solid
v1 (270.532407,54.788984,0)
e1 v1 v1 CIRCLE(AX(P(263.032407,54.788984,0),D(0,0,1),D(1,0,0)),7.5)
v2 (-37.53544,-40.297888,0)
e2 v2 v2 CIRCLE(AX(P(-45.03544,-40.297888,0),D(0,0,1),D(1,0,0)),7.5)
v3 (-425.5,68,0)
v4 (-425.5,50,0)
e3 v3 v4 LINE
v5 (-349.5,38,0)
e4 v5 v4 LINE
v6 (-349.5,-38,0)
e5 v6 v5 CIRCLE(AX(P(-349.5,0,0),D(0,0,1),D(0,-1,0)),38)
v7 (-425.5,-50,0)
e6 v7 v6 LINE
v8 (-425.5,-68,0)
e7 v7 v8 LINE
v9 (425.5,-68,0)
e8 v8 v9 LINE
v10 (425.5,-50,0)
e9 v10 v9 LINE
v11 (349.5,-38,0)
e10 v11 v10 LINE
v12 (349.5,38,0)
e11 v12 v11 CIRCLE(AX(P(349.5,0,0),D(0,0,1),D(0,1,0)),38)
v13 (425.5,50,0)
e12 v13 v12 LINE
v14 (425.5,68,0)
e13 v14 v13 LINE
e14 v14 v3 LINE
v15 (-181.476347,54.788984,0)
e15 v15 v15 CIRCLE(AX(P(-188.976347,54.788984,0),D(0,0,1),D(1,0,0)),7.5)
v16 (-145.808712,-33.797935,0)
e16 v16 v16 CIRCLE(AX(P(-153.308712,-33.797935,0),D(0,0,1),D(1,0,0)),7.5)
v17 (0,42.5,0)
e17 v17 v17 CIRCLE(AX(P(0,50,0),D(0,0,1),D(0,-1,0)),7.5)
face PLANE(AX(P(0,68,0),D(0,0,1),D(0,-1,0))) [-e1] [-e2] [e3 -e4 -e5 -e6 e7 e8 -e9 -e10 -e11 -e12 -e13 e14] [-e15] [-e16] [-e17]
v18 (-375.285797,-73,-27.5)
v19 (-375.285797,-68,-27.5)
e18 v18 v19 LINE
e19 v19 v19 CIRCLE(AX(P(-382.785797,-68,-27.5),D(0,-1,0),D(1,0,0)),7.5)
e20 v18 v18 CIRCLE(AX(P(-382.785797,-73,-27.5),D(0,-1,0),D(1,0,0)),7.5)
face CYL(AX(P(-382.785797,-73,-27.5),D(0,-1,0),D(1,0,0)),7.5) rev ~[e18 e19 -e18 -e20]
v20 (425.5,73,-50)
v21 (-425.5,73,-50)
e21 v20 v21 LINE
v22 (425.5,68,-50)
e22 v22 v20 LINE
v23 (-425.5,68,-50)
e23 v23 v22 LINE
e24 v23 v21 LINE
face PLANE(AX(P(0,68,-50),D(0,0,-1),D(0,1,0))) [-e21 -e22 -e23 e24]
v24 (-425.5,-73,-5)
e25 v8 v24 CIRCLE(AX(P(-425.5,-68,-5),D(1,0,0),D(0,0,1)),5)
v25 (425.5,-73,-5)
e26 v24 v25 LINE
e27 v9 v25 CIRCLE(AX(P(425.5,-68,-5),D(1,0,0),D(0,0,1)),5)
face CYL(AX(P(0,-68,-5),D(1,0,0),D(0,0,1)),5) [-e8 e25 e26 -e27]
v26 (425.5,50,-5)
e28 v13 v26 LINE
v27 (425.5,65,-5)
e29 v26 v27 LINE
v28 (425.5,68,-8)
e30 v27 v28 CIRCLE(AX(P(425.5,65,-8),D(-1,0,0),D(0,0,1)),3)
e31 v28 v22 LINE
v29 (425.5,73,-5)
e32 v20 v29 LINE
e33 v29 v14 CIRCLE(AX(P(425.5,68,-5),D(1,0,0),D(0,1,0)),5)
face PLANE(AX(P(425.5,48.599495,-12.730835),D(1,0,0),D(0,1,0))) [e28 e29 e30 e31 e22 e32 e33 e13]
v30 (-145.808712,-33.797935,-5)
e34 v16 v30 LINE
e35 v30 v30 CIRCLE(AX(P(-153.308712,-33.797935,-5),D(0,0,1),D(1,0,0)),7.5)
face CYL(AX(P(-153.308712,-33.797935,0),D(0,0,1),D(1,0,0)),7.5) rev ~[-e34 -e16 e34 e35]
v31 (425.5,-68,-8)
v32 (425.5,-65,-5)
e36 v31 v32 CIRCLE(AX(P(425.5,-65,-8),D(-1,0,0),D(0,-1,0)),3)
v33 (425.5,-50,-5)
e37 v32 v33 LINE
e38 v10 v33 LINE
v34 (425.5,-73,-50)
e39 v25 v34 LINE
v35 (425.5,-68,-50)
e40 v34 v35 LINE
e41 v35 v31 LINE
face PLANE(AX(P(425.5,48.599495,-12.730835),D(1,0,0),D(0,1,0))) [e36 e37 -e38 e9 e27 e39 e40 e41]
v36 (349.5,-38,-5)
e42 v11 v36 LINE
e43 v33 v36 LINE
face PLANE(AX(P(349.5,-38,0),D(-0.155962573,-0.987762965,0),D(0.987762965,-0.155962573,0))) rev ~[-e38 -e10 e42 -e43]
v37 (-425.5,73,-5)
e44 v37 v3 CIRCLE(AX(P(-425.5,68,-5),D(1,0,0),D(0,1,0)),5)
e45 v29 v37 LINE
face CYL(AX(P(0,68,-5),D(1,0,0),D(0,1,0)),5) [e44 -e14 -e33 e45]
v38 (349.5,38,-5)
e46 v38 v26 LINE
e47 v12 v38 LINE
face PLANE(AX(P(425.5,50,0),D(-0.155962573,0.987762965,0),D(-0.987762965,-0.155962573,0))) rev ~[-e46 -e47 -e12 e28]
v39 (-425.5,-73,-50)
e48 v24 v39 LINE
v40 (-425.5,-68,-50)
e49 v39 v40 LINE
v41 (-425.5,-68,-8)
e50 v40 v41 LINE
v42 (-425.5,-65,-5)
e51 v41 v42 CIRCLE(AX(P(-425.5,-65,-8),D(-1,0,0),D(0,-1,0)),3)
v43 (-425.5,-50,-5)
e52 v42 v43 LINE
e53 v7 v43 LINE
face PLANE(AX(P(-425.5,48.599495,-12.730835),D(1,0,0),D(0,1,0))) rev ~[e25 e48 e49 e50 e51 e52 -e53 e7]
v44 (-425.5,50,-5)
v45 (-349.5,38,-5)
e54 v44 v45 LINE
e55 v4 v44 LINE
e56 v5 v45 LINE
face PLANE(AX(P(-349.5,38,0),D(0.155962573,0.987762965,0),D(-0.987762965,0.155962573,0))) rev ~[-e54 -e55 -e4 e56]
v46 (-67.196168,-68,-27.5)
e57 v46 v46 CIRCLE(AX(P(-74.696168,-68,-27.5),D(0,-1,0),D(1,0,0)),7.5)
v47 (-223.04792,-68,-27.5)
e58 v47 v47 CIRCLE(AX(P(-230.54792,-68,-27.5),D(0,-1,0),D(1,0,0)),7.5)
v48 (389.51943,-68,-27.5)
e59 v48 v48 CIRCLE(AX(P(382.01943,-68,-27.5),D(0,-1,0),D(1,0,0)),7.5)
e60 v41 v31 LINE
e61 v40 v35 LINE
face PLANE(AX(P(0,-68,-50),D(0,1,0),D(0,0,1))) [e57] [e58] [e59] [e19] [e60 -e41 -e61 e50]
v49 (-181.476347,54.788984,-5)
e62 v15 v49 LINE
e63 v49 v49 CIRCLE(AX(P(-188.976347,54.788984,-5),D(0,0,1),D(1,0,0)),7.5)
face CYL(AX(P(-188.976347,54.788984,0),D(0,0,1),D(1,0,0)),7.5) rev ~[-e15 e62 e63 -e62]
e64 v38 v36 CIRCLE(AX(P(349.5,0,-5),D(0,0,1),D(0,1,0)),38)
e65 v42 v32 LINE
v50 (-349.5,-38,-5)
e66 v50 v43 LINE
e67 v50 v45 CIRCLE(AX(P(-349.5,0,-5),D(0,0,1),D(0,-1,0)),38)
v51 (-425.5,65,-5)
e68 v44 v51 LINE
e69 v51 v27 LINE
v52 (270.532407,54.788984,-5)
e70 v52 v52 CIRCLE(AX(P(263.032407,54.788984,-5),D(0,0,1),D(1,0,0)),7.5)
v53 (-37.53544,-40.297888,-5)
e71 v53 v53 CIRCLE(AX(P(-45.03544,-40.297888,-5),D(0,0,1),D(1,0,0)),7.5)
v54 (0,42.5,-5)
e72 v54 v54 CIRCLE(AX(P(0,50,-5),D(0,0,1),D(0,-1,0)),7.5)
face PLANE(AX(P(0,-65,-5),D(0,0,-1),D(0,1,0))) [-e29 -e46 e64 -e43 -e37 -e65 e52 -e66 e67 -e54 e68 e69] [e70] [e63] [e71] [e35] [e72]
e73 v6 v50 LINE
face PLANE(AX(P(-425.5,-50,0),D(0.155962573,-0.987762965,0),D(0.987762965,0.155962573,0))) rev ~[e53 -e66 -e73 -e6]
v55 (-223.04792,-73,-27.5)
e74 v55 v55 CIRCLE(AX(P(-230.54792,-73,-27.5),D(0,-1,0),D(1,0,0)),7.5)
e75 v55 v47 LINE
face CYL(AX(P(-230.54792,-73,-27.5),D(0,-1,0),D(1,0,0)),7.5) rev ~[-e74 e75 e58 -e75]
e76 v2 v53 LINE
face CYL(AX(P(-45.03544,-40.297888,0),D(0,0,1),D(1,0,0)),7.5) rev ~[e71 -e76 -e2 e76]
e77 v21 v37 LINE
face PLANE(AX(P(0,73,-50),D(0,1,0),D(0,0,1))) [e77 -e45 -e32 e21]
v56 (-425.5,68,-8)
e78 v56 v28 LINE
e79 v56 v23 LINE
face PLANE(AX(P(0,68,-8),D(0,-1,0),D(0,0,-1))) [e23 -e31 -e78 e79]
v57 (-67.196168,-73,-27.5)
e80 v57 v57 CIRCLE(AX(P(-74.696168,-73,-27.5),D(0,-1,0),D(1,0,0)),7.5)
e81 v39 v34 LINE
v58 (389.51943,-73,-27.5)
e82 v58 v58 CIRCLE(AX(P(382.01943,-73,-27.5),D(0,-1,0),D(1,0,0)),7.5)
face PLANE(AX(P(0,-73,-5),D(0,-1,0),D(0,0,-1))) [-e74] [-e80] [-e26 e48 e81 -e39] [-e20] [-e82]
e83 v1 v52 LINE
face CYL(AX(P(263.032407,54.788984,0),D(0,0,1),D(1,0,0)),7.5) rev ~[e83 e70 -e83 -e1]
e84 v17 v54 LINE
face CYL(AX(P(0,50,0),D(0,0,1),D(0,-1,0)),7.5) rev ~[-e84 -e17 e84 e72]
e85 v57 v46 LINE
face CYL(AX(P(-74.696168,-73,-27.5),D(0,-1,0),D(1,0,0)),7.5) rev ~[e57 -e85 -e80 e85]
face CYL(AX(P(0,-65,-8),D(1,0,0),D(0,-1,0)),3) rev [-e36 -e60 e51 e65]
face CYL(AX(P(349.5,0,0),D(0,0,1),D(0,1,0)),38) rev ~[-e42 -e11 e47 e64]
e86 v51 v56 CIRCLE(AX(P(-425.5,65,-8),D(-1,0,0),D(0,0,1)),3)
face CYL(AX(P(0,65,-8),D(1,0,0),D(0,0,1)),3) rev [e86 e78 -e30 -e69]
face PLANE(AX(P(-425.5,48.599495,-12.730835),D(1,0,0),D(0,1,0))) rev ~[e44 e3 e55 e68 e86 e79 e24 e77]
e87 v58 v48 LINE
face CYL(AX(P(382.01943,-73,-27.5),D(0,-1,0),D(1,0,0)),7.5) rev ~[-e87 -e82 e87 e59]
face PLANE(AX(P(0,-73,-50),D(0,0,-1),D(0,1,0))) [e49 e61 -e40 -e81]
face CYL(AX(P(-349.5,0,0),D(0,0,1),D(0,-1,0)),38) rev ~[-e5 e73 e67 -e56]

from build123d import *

# Parameters (mm, degrees)
F1_DEPTH = 425.5
F2_R     = 7.5
F3_DEPTH = 81
F4_R     = 7.5
F5_DEPTH = 25


# Not quite as in the source:
# - a feature names something its author has since deleted; it is built from what else it names


with BuildPart() as f1:
    # F0 (on Right) → F1 (new body, symmetric)
    with BuildSketch(Plane.YZ):
        with BuildLine():
            Line((68, 0), (0, 0))
            Line((0, 0), (0, -5))
            Line((0, -5), (65, -5))
            ThreePointArc((65, -5), (67.1213203436, -5.8786796564), (68, -8))
            Line((68, -8), (68, -50))
            Line((68, -50), (73, -50))
            Line((73, -50), (73, -5))
            ThreePointArc((73, -5), (71.5355339059, -1.4644660941), (68, 0))
        make_face()
        with BuildLine():
            Line((0, -5), (0, 0))
            Line((0, 0), (-68, 0))
            ThreePointArc((-68, 0), (-71.5355339059, -1.4644660941), (-73, -5))
            Line((-73, -5), (-73, -50))
            Line((-73, -50), (-68, -50))
            Line((-68, -50), (-68, -8))
            ThreePointArc((-68, -8), (-67.1213203436, -5.8786796564), (-65, -5))
            Line((-65, -5), (0, -5))
        make_face()
    extrude(amount=F1_DEPTH, both=True)

    # F2 (on face) → F3 (cut)
    with BuildSketch(Plane.XY):
        with BuildLine():
            Line((-349.5, 38), (-425.5, 50))
            Line((-425.5, 50), (-425.5, 0))
            Line((-425.5, 0), (-425.5, -50))
            Line((-425.5, -50), (-349.5, -38))
            ThreePointArc((-349.5, -38), (-311.5, 0), (-349.5, 38))
        make_face()
        with BuildLine():
            ThreePointArc((0, 57.5), (-7.5, 50), (0, 42.5))
            Line((0, 42.5), (0, 57.5))
        make_face()
        with BuildLine():
            Line((0, 57.5), (0, 42.5))
            ThreePointArc((0, 42.5), (5.3033008589, 44.6966991411), (7.5, 50))
            ThreePointArc((7.5, 50), (5.3033008589, 55.3033008589), (0, 57.5))
        make_face()
        with BuildLine():
            ThreePointArc((349.5, 38), (311.5, 0), (349.5, -38))
            Line((349.5, -38), (425.5, -50))
            Line((425.5, -50), (425.5, 50))
            Line((425.5, 50), (349.5, 38))
        make_face()
        with Locations((-188.9763474464, 54.7889843583)):
            Circle(F2_R)
        with Locations((263.0324065685, 54.7889843583)):
            Circle(F2_R)
        with Locations((-153.3087122573, -33.7979345426)):
            Circle(F2_R)
        with Locations((-45.0354404747, -40.2978882194)):
            Circle(F2_R)
    extrude(amount=-F3_DEPTH, mode=Mode.SUBTRACT)

    # F4 (on face) → F5 (cut)
    with BuildSketch(Plane.XZ.offset(73)):
        with Locations((-382.7857971191, -27.5)):
            Circle(F4_R)
        with Locations((382.0194303989, -27.5)):
            Circle(F4_R)
        with Locations((-230.5479198694, -27.5)):
            Circle(F4_R)
        with Locations((-74.6961683035, -27.5)):
            Circle(F4_R)
    extrude(amount=-F5_DEPTH, mode=Mode.SUBTRACT)


solid = f1.part
